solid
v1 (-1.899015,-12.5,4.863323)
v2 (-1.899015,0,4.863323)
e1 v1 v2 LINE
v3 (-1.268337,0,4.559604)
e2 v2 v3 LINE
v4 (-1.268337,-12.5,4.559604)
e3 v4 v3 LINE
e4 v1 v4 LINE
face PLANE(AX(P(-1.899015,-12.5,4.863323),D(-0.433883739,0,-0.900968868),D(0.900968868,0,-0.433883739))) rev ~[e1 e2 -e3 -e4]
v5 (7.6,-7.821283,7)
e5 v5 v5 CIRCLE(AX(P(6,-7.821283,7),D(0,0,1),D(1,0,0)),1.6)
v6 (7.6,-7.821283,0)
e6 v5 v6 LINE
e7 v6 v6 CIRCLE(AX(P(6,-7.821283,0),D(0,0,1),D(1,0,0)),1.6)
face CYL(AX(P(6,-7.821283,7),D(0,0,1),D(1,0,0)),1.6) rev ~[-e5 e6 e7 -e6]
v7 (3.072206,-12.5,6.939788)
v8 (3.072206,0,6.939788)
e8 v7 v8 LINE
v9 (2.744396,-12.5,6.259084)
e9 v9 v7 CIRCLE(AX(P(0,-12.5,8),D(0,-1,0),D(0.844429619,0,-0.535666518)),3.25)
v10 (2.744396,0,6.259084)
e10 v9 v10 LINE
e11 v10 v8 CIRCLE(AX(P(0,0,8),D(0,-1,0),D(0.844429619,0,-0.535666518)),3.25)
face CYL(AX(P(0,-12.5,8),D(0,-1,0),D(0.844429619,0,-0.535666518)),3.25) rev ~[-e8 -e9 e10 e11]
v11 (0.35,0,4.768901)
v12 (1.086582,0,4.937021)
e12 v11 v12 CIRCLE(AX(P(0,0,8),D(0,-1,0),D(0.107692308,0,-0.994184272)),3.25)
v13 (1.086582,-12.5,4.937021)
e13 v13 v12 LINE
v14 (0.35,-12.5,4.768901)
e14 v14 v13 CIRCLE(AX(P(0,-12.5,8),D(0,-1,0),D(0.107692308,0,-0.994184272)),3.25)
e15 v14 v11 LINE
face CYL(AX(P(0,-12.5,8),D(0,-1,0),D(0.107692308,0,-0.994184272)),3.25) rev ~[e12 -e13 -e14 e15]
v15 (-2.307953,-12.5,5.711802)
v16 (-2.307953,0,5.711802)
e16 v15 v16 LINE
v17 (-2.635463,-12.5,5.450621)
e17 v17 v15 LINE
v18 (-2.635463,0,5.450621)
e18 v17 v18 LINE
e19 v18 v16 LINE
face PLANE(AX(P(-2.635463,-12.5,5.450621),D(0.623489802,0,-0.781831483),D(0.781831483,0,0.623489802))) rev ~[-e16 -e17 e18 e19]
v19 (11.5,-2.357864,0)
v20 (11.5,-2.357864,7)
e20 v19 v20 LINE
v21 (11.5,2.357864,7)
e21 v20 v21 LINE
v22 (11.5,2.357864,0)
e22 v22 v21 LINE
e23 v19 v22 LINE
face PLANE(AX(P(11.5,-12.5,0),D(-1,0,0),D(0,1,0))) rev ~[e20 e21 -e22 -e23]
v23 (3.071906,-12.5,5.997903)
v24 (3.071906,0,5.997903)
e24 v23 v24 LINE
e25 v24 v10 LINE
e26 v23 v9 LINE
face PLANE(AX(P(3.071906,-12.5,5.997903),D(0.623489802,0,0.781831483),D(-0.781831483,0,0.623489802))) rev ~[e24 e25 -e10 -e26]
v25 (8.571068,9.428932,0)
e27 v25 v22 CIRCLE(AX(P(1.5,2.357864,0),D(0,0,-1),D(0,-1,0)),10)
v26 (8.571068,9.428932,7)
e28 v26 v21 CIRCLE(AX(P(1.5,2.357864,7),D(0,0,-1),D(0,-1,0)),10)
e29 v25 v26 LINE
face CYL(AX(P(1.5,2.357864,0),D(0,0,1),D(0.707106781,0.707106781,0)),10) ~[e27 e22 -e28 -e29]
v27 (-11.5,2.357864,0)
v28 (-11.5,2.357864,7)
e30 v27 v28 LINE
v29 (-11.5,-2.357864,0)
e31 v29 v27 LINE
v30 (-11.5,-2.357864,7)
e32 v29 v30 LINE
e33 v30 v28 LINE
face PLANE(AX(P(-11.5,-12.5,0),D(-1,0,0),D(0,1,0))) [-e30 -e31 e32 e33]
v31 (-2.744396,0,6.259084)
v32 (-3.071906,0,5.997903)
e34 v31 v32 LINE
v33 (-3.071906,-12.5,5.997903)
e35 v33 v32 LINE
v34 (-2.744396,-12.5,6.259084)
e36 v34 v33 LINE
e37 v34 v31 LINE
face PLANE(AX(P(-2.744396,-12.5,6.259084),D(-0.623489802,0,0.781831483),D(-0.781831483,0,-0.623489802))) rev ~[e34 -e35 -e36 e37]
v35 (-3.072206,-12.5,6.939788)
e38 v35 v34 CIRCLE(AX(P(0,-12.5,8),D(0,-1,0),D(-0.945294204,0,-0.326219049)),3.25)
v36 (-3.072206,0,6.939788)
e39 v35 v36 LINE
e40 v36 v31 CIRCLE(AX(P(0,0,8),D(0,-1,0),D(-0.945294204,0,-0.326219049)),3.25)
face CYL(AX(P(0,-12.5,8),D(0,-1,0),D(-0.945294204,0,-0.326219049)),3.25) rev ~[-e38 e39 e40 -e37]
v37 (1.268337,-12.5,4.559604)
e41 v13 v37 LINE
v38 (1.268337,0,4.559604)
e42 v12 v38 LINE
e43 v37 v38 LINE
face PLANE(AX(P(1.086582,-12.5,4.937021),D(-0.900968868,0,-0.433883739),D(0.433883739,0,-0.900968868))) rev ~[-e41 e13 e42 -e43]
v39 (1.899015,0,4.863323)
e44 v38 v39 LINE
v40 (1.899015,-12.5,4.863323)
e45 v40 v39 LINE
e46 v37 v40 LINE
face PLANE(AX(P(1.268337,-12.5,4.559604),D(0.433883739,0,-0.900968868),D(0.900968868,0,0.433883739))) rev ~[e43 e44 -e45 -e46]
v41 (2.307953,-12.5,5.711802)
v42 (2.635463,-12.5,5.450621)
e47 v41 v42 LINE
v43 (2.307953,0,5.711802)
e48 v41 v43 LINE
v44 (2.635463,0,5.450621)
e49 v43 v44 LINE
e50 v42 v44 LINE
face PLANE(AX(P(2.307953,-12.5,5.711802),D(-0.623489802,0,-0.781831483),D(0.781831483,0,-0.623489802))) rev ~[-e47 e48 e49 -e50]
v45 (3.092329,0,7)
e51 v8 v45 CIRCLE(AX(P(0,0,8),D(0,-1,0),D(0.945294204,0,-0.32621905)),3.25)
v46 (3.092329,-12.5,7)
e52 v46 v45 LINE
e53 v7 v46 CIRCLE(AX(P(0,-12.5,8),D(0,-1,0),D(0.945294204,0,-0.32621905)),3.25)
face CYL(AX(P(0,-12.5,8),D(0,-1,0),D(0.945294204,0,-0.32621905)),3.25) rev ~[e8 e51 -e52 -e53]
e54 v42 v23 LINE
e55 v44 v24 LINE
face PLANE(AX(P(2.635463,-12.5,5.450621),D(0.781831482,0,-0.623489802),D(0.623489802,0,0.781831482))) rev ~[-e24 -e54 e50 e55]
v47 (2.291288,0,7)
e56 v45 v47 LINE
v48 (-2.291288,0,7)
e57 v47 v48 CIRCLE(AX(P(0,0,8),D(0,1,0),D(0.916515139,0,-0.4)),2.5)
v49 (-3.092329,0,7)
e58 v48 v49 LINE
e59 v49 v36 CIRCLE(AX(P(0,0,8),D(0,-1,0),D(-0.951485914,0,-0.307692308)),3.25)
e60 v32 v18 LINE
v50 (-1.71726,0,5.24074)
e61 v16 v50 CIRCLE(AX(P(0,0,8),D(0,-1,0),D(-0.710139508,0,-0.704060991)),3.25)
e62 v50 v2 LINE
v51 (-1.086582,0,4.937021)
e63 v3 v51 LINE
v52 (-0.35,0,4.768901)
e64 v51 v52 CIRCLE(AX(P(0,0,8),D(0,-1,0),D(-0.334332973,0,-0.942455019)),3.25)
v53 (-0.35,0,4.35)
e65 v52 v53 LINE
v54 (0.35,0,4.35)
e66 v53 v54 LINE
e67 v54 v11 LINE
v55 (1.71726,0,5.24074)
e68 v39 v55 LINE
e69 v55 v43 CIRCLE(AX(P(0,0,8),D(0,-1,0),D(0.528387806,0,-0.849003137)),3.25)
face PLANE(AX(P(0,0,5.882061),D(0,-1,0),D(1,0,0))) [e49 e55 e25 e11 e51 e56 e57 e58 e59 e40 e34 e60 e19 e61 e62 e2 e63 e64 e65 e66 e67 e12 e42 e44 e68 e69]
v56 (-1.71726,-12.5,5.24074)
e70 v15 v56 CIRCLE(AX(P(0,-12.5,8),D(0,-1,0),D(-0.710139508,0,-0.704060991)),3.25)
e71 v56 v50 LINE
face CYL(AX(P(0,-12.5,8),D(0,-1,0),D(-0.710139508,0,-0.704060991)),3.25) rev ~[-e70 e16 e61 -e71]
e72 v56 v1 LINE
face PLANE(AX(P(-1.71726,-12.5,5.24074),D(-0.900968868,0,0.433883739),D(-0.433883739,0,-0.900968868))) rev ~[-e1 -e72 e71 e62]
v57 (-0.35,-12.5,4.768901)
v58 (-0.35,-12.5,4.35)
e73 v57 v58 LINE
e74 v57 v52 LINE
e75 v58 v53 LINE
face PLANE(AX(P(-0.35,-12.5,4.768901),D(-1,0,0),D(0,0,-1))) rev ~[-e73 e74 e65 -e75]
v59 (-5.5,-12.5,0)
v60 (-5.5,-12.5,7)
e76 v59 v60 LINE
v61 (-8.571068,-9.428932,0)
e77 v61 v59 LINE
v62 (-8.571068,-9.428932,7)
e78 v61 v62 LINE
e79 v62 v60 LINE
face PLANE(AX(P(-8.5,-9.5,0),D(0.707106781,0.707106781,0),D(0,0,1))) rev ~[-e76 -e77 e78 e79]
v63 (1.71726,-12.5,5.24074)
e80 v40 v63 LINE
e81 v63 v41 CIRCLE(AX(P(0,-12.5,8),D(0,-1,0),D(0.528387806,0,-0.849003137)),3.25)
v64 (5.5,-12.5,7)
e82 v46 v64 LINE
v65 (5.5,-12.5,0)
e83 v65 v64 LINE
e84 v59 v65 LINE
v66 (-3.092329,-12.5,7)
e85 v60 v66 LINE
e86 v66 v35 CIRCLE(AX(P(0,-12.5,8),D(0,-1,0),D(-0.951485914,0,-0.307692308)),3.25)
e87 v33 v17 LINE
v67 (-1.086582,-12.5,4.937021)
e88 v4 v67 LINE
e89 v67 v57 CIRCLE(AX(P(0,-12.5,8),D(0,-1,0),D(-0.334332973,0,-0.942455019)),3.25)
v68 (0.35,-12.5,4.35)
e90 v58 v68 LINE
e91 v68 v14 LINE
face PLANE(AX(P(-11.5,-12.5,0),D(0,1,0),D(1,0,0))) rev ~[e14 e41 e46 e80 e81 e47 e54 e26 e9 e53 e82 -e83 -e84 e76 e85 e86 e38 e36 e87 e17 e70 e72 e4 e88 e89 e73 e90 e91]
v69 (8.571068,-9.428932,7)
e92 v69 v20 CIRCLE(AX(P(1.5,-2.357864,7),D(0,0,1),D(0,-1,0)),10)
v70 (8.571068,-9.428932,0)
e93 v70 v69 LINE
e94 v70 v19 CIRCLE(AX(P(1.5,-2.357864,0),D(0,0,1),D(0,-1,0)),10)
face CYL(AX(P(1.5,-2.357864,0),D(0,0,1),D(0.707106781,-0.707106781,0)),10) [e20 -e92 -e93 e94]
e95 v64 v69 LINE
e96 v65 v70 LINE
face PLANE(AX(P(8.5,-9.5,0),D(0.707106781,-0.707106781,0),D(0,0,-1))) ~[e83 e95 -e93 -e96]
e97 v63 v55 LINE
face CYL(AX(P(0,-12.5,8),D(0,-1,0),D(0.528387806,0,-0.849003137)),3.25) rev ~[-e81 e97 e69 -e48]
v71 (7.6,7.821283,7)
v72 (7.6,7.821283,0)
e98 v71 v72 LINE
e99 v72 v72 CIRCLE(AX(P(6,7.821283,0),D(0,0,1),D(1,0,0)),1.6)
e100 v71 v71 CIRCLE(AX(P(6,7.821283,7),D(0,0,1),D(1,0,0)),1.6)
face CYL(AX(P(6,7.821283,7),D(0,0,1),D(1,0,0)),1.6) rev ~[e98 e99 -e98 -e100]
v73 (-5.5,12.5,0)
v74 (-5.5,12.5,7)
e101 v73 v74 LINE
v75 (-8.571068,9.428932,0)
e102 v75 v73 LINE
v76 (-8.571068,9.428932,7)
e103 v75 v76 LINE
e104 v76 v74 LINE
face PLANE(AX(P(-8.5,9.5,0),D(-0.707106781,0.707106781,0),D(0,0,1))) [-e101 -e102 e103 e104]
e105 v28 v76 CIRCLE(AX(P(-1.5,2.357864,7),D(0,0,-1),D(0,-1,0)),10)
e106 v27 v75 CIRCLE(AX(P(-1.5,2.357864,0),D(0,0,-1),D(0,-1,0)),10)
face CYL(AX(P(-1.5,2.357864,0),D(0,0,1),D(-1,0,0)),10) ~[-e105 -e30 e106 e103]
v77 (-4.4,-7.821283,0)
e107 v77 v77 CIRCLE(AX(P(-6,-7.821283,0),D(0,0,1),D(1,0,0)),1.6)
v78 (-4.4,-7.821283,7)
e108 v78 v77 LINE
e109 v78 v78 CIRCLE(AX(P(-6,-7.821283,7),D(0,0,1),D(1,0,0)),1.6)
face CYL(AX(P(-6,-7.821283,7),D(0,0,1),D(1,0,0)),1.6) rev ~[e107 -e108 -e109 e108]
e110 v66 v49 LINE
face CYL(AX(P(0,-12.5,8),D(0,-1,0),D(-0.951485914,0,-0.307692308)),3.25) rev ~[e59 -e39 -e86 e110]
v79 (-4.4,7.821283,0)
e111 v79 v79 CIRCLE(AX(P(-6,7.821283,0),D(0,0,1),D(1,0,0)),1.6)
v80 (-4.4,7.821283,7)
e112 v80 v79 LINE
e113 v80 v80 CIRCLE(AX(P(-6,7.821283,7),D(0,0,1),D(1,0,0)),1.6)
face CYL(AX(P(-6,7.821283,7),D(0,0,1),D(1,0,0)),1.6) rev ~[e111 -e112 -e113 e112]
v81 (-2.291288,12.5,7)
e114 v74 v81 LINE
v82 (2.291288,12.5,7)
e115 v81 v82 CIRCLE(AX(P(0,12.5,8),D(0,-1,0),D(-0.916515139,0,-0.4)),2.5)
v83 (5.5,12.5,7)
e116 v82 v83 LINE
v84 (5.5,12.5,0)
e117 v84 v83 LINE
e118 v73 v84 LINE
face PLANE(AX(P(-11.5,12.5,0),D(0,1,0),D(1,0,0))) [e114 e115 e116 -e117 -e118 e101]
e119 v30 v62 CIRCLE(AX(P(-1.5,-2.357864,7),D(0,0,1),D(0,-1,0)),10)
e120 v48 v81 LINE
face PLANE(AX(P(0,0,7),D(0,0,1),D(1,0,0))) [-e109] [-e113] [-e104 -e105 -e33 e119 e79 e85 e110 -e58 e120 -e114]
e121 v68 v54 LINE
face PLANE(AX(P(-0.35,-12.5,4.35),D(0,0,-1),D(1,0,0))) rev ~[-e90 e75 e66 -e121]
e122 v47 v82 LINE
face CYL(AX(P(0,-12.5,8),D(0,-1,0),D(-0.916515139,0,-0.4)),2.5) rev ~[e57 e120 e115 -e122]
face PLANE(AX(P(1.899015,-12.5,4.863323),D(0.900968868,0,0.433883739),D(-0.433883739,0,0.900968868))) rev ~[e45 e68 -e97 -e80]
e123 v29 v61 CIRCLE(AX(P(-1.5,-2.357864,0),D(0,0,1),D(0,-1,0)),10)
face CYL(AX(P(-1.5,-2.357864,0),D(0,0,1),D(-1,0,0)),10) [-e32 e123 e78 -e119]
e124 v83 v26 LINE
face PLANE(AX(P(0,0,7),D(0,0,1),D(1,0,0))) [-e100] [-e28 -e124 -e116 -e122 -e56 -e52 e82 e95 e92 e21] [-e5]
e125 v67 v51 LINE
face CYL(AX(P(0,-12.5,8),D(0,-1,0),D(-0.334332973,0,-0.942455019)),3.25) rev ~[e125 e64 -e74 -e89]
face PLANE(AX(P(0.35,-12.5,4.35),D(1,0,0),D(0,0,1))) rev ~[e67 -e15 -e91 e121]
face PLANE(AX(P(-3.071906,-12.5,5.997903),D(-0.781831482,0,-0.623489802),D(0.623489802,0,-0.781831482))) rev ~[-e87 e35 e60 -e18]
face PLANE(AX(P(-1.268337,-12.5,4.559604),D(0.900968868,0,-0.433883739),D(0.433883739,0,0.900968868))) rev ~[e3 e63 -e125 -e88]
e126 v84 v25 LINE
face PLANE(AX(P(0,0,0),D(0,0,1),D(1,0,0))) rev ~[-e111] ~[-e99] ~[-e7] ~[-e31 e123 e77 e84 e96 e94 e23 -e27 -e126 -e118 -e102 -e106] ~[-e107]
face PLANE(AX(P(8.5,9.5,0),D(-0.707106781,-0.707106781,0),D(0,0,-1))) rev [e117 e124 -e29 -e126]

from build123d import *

# Parameters (mm, degrees)
F0_W     = 23
F0_H     = 25
F1_DEPTH = 7
F3_DEPTH = 25.001
F4_DEPTH = 12.5
F5_SIZE  = 6
F6_R     = 10
F7_R     = 1.6
F8_DEPTH = 25


with BuildPart() as f1:
    # F0 (on Top) → F1 (new body)
    with BuildSketch(Plane.XY):
        Rectangle(F0_W, F0_H)
    extrude(amount=F1_DEPTH)

    # F2 (on face) → F3 (cut, through all)
    with BuildSketch(Plane.XZ.offset(12.5)):
        with BuildLine():
            Line((0, 7), (-2.2912878475, 7))
            ThreePointArc((-2.2912878475, 7), (0, 5.5), (2.2912878475, 7))
            Line((2.2912878475, 7), (0, 7))
        make_face()
    extrude(amount=-F3_DEPTH, mode=Mode.SUBTRACT)

    # F2 (on face) → F4 (cut)
    with BuildSketch(Plane.XZ.offset(12.5)):
        with BuildLine():
            ThreePointArc((2.2912878475, 7), (0, 5.5), (-2.2912878475, 7))
            Line((-2.2912878475, 7), (-2.8084005449, 7))
            Line((-2.8084005449, 7), (-3.0722061624, 6.9397880893))
            ThreePointArc((-3.0722061624, 6.9397880893), (-2.9281488207, 6.5898778479), (-2.7443962613, 6.2590838157))
            Line((-2.7443962613, 6.2590838157), (-2.4464411557, 6.4966950836))
            Line((-2.4464411557, 6.4966950836), (-2.0099982944, 5.9494130458))
            Line((-2.0099982944, 5.9494130458), (-2.3079534, 5.711801778))
            ThreePointArc((-2.3079534, 5.711801778), (-2.026341856, 5.459047682), (-1.7172603691, 5.2407398048))
            Line((-1.7172603691, 5.2407398048), (-1.5519077603, 5.5840980352))
            Line((-1.5519077603, 5.5840980352), (-0.9212295527, 5.2803794178))
            Line((-0.9212295527, 5.2803794178), (-1.0865821616, 4.9370211875))
            ThreePointArc((-1.0865821616, 4.9370211875), (-0.7231930354, 4.8314842854), (-0.35, 4.7689011157))
            Line((-0.35, 4.7689011157), (-0.35, 5.15))
            Line((-0.35, 5.15), (0.35, 5.15))
            Line((0.35, 5.15), (0.35, 4.7689011157))
            ThreePointArc((0.35, 4.7689011157), (0.7231930354, 4.8314842854), (1.0865821616, 4.9370211875))
            Line((1.0865821616, 4.9370211875), (0.9212295527, 5.2803794178))
            Line((0.9212295527, 5.2803794178), (1.5519077603, 5.5840980352))
            Line((1.5519077603, 5.5840980352), (1.7172603691, 5.2407398048))
            ThreePointArc((1.7172603691, 5.2407398048), (2.026341856, 5.459047682), (2.3079534, 5.711801778))
            Line((2.3079534, 5.711801778), (2.0099982944, 5.9494130458))
            Line((2.0099982944, 5.9494130458), (2.4464411557, 6.4966950836))
            Line((2.4464411557, 6.4966950836), (2.7443962613, 6.2590838157))
            ThreePointArc((2.7443962613, 6.2590838157), (2.9281488207, 6.5898778479), (3.0722061624, 6.9397880893))
            Line((3.0722061624, 6.9397880893), (2.8084005449, 7))
            Line((2.8084005449, 7), (2.2912878475, 7))
        make_face()
        with BuildLine():
            Line((3.0719063417, 5.9979032421), (2.7443962613, 6.2590838157))
            ThreePointArc((2.7443962613, 6.2590838157), (2.540952318, 5.973658144), (2.3079534, 5.711801778))
            Line((2.3079534, 5.711801778), (2.6354634804, 5.4506212044))
            Line((2.6354634804, 5.4506212044), (3.0719063417, 5.9979032421))
        make_face()
        with BuildLine():
            ThreePointArc((2.3079534, 5.711801778), (2.540952318, 5.973658144), (2.7443962613, 6.2590838157))
            Line((2.7443962613, 6.2590838157), (2.4464411557, 6.4966950836))
            Line((2.4464411557, 6.4966950836), (2.0099982944, 5.9494130458))
            Line((2.0099982944, 5.9494130458), (2.3079534, 5.711801778))
        make_face()
        with BuildLine():
            Line((1.8990147515, 4.8633229408), (1.7172603691, 5.2407398048))
            ThreePointArc((1.7172603691, 5.2407398048), (1.4101221521, 5.0718511793), (1.0865821616, 4.9370211875))
            Line((1.0865821616, 4.9370211875), (1.268336544, 4.5596043235))
            Line((1.268336544, 4.5596043235), (1.8990147515, 4.8633229408))
        make_face()
        with BuildLine():
            ThreePointArc((1.0865821616, 4.9370211875), (1.4101221521, 5.0718511793), (1.7172603691, 5.2407398048))
            Line((1.7172603691, 5.2407398048), (1.5519077603, 5.5840980352))
            Line((1.5519077603, 5.5840980352), (0.9212295527, 5.2803794178))
            Line((0.9212295527, 5.2803794178), (1.0865821616, 4.9370211875))
        make_face()
        with BuildLine():
            ThreePointArc((0.35, 4.7689011157), (0, 4.75), (-0.35, 4.7689011157))
            Line((-0.35, 4.7689011157), (-0.35, 4.35))
            Line((-0.35, 4.35), (0.35, 4.35))
            Line((0.35, 4.35), (0.35, 4.7689011157))
        make_face()
        with BuildLine():
            Line((-0.35, 5.15), (-0.35, 4.7689011157))
            ThreePointArc((-0.35, 4.7689011157), (0, 4.75), (0.35, 4.7689011157))
            Line((0.35, 4.7689011157), (0.35, 5.15))
            Line((0.35, 5.15), (-0.35, 5.15))
        make_face()
        with BuildLine():
            ThreePointArc((-1.0865821616, 4.9370211875), (-1.4101221521, 5.0718511793), (-1.7172603691, 5.2407398048))
            Line((-1.7172603691, 5.2407398048), (-1.8990147515, 4.8633229408))
            Line((-1.8990147515, 4.8633229408), (-1.268336544, 4.5596043235))
            Line((-1.268336544, 4.5596043235), (-1.0865821616, 4.9370211875))
        make_face()
        with BuildLine():
            Line((-1.5519077603, 5.5840980352), (-1.7172603691, 5.2407398048))
            ThreePointArc((-1.7172603691, 5.2407398048), (-1.4101221521, 5.0718511793), (-1.0865821616, 4.9370211875))
            Line((-1.0865821616, 4.9370211875), (-0.9212295527, 5.2803794178))
            Line((-0.9212295527, 5.2803794178), (-1.5519077603, 5.5840980352))
        make_face()
        with BuildLine():
            ThreePointArc((-2.3079534, 5.711801778), (-2.540952318, 5.973658144), (-2.7443962613, 6.2590838157))
            Line((-2.7443962613, 6.2590838157), (-3.0719063417, 5.9979032421))
            Line((-3.0719063417, 5.9979032421), (-2.6354634804, 5.4506212044))
            Line((-2.6354634804, 5.4506212044), (-2.3079534, 5.711801778))
        make_face()
        with BuildLine():
            Line((-2.4464411557, 6.4966950836), (-2.7443962613, 6.2590838157))
            ThreePointArc((-2.7443962613, 6.2590838157), (-2.540952318, 5.973658144), (-2.3079534, 5.711801778))
            Line((-2.3079534, 5.711801778), (-2.0099982944, 5.9494130458))
            Line((-2.0099982944, 5.9494130458), (-2.4464411557, 6.4966950836))
        make_face()
        with BuildLine():
            Line((3.0923292192, 7), (2.8084005449, 7))
            Line((2.8084005449, 7), (3.0722061624, 6.9397880893))
            ThreePointArc((3.0722061624, 6.9397880893), (3.0824147168, 6.969844908), (3.0923292192, 7))
        make_face()
        with BuildLine():
            Line((-3.0722061624, 6.9397880893), (-2.8084005449, 7))
            Line((-2.8084005449, 7), (-3.0923292192, 7))
            ThreePointArc((-3.0923292192, 7), (-3.0824147168, 6.969844908), (-3.0722061624, 6.9397880893))
        make_face()
    extrude(amount=-F4_DEPTH, mode=Mode.SUBTRACT)

    # F5
    f5_edges = [f1.edges().sort_by_distance(p)[0] for p in [
        (11.5, -12.5, 3.5),
        (-11.5, -12.5, 3.5),
        (11.5, 12.5, 3.5),
        (-11.5, 12.5, 3.5),
    ]]
    chamfer(f5_edges, length=F5_SIZE)

    # F6
    f6_edges = [f1.edges().sort_by_distance(p)[0] for p in [
        (11.5, 6.5, 3.5),
        (11.5, -6.5, 3.5),
        (-11.5, 6.5, 3.5),
        (-11.5, -6.5, 3.5),
    ]]
    fillet(f6_edges, radius=F6_R)

    # F7 (on face) → F8 (cut)
    with BuildSketch(Plane.XY.offset(7)):
        with Locations((6, -7.8212832158)):
            Circle(F7_R)
        with Locations((-6, -7.8212832158)):
            Circle(F7_R)
        with Locations((-6, 7.8212832158)):
            Circle(F7_R)
        with Locations((6, 7.8212832158)):
            Circle(F7_R)
    extrude(amount=-F8_DEPTH, mode=Mode.SUBTRACT)


solid = f1.part
